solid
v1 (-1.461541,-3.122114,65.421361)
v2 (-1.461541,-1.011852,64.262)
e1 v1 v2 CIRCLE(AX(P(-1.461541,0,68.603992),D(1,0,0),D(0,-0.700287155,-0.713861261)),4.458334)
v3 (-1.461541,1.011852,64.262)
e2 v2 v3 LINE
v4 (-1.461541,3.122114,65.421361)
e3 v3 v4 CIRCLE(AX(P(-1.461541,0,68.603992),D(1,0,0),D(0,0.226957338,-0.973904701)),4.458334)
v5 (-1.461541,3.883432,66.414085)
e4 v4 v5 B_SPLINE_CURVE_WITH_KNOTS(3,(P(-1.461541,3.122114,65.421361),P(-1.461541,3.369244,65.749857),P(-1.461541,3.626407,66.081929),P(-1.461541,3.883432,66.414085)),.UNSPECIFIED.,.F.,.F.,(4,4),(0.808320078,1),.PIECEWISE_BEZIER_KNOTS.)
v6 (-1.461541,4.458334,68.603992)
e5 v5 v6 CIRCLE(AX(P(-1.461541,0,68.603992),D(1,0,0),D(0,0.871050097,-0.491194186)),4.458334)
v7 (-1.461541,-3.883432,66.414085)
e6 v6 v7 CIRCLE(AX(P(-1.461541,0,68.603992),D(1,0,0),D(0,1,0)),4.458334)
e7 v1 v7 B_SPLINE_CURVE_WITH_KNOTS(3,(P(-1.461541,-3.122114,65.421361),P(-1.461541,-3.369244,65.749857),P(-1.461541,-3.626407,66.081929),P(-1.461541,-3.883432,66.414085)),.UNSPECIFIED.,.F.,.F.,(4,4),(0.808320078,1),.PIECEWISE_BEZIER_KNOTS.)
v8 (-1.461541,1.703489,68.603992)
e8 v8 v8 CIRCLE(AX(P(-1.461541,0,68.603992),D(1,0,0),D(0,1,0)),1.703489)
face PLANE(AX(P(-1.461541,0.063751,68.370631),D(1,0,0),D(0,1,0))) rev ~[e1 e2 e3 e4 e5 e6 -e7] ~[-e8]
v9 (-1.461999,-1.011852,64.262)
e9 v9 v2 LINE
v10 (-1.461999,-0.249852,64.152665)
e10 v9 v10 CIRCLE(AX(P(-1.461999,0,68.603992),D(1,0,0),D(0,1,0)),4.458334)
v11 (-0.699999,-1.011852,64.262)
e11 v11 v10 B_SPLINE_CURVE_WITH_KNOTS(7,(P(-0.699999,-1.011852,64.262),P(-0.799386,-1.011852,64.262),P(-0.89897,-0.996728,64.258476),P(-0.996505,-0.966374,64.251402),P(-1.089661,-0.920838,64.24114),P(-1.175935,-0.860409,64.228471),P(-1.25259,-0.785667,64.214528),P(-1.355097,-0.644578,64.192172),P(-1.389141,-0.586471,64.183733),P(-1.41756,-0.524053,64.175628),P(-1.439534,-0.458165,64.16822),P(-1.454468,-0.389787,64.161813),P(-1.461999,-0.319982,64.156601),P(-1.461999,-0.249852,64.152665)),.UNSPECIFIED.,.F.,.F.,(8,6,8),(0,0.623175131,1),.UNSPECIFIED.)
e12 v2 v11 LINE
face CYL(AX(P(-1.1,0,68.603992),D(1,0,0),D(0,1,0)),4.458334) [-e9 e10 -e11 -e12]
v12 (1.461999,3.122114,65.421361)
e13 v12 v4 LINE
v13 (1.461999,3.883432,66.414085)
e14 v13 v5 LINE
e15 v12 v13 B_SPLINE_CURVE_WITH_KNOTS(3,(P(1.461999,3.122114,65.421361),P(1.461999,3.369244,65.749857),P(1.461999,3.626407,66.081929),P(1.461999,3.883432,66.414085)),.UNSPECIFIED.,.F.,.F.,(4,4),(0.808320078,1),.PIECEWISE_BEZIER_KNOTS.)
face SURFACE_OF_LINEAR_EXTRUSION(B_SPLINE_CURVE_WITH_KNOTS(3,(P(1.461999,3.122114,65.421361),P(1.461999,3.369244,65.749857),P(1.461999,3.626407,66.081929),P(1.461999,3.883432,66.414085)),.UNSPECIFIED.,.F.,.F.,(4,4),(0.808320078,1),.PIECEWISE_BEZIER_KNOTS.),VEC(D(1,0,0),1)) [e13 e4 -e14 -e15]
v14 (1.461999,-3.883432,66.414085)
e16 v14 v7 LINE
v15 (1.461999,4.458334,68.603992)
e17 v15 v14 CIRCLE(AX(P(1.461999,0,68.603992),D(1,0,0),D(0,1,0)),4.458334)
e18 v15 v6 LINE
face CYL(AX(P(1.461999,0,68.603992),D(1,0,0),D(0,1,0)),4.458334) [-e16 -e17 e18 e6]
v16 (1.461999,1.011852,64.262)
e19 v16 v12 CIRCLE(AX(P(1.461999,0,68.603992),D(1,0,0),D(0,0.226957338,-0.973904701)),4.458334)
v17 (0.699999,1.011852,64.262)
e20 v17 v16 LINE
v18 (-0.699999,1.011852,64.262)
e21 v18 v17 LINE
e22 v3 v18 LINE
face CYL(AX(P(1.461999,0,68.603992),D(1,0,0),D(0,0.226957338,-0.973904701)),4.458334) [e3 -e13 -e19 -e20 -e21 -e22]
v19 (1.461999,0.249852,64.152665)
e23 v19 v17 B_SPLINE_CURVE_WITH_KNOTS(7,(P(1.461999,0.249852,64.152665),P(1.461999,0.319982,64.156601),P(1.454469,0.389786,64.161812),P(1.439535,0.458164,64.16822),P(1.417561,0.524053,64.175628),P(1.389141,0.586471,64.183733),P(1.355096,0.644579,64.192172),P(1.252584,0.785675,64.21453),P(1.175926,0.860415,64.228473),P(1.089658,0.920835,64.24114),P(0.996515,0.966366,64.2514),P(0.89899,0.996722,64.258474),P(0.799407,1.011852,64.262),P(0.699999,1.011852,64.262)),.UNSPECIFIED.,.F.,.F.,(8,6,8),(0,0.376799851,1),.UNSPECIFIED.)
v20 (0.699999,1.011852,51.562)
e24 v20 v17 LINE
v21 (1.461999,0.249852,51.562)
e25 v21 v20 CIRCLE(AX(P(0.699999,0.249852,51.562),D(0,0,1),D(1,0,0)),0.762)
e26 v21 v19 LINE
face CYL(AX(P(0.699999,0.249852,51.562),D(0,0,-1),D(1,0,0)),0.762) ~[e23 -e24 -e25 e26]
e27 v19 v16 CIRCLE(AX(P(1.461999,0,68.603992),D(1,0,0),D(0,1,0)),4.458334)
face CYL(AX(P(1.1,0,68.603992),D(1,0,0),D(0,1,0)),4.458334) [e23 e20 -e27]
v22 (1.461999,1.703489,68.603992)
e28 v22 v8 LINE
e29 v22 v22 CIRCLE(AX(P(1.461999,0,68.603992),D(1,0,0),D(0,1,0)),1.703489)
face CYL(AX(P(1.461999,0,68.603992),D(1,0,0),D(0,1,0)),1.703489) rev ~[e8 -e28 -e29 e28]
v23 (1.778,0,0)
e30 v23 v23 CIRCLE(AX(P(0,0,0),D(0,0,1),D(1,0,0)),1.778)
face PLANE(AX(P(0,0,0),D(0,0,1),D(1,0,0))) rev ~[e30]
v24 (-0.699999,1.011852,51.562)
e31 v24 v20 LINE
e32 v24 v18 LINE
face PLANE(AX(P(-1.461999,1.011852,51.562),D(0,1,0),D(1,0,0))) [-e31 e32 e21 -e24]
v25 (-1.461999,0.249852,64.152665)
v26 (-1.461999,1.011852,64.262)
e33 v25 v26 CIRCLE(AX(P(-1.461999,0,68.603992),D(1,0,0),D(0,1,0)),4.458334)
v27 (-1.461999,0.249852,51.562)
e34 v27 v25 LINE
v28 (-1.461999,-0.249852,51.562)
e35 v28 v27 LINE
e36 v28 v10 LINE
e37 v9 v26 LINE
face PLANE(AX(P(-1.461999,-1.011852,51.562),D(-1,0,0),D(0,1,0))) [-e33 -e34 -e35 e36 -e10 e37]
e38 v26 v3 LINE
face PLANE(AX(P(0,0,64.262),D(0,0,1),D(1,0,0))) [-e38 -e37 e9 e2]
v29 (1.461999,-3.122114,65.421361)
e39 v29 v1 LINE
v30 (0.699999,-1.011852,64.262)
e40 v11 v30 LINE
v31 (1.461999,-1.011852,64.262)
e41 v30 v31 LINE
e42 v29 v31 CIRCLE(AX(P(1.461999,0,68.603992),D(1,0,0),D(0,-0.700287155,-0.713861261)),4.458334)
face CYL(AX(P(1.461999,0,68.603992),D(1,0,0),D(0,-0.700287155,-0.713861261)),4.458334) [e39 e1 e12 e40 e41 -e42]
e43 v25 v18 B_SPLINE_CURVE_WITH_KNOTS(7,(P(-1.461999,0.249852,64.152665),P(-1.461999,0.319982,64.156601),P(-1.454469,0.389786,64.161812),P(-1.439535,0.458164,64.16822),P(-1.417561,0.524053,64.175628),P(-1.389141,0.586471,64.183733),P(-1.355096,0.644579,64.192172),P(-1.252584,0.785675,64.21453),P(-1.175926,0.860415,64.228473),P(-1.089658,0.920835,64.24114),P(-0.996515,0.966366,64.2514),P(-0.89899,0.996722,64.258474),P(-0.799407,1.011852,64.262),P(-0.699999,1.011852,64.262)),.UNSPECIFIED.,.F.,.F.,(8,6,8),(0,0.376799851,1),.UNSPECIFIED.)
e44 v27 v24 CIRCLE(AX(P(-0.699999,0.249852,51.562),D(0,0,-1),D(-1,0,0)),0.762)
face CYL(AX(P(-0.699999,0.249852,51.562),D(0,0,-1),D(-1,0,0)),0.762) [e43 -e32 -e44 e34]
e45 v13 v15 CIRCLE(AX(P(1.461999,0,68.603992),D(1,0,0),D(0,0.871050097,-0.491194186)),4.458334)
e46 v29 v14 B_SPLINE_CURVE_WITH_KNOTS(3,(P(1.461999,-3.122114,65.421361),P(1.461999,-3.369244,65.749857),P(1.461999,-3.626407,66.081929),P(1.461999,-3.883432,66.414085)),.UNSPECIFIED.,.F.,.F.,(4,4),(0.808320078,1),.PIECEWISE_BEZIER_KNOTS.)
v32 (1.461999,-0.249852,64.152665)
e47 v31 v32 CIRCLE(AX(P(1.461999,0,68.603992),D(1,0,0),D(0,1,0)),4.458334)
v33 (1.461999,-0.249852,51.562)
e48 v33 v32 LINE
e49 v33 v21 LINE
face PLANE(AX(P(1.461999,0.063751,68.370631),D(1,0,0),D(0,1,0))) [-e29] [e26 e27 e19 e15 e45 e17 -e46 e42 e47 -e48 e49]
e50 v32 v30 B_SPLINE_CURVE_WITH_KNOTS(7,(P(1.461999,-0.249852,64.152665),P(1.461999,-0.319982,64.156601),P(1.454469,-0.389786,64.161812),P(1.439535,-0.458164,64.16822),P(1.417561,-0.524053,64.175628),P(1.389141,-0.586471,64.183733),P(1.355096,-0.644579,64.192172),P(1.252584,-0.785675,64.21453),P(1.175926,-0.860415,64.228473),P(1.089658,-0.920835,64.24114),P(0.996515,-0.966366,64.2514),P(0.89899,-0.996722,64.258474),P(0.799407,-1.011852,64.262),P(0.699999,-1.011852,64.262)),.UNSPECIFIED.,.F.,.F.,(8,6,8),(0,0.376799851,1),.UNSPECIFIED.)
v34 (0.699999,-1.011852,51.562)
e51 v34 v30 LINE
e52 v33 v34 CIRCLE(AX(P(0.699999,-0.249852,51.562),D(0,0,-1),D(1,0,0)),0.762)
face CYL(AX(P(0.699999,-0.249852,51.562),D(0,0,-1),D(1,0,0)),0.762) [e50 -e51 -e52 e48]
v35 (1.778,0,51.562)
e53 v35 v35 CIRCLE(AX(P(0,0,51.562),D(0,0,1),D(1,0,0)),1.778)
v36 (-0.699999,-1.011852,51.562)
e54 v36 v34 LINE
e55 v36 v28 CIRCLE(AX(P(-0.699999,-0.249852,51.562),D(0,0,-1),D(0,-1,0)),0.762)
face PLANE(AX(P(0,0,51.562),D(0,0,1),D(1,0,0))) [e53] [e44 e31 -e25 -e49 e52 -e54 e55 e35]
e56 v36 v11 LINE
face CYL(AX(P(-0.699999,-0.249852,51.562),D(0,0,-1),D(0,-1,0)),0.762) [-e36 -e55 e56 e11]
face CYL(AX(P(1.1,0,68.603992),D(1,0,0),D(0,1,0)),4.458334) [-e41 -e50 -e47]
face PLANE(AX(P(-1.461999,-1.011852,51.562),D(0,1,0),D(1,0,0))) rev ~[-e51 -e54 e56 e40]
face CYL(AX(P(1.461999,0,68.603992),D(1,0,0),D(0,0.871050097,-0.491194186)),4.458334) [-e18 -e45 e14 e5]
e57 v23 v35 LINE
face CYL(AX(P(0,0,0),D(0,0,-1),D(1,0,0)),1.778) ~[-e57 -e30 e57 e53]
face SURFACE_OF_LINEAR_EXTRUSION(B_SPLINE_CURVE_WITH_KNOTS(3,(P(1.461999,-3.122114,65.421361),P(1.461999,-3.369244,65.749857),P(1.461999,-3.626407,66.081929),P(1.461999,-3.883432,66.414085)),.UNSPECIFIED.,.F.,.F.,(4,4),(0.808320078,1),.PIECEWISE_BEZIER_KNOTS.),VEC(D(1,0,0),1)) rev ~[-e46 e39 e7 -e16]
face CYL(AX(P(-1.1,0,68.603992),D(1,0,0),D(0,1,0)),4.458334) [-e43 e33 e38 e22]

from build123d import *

# Parameters (mm, degrees)
F0_R         = 1.778
F1_DEPTH     = 51.562
F2_W         = 2.9239974657
F2_H         = 2.0237032442
F3_DEPTH     = 12.7
F4_R         = 1.7034886821
F5_DEPTH     = 2.92354
F6_T4_DEPTH  = 14.605
F6_S5_R      = 4.4583340214
F6_T6_DEPTH  = 9
F6_T10_DEPTH = 14.605
F6_S11_R     = 4.4583340214
F6_T12_DEPTH = 9
F6_T16_DEPTH = 14.605
F6_S17_R     = 4.4583340214
F6_T18_DEPTH = 9
F6_T22_DEPTH = 14.605
F6_S23_R     = 4.4583340214
F6_T24_DEPTH = 9


# Not quite as in the source:
# - a fillet or chamfer that OpenCascade refuses, or shapes differently, is made with other operations: its cross-section is extruded or revolved along the edge and cut away or added


with BuildPart() as f1:
    # F0 (on Top) → F1 (new body)
    with BuildSketch(Plane.XY):
        Circle(F0_R)
    extrude(amount=F1_DEPTH)

    # F2 (on face) → F3 (join)
    with BuildSketch(Plane.XY.offset(51.562)):
        Rectangle(F2_W, F2_H)
    extrude(amount=F3_DEPTH)

    # F4 (on face) → F5 (join)
    with BuildSketch(Plane.YZ.offset(1.4619987328)):
        with BuildLine():
            ThreePointArc((3.8834322811, 66.4140847097), (4.3122140778, 67.4719359292), (4.4583340214, 68.6039924622))
            ThreePointArc((4.4583340214, 68.6039924622), (-1.132056533, 72.91620654), (-3.8834322811, 66.4140847097))
            add(Edge.make_bspline(
                [(-3.1221140478, 65.4213605138), (-3.3692442223, 65.7498568477), (-3.6264069605, 66.0819292585), (-3.8834322811, 66.4140847097)],
                knots=[0.8083200784, 0.8083200784, 0.8083200784, 0.8083200784, 1, 1, 1, 1], degree=3))
            ThreePointArc((-3.1221140478, 65.4213605138), (-2.1467294288, 64.6965258908), (-1.0118516221, 64.262))
            Line((-1.0118516221, 64.262), (1.0118516221, 64.262))
            ThreePointArc((1.0118516221, 64.262), (2.1467294288, 64.6965258908), (3.1221140478, 65.4213605138))
            add(Edge.make_bspline(
                [(3.1221140478, 65.4213605138), (3.3692442223, 65.7498568477), (3.6264069605, 66.0819292585), (3.8834322811, 66.4140847097)],
                knots=[0.8083200784, 0.8083200784, 0.8083200784, 0.8083200784, 1, 1, 1, 1], degree=3))
        make_face()
        with Locations((0, 68.6039924622)):
            Circle(F4_R, mode=Mode.SUBTRACT)
    extrude(amount=-F5_DEPTH)

    # F6: fillet of radius 0.762 on 4 edges, made by hand


with BuildPart() as f6_tool2:
    # F6_s3 → F6_t4 (new body)
    with BuildSketch(Plane.XY.offset(51.562)):
        with BuildLine():
            ThreePointArc((1.4619987328, -0.2498516221), (1.2388141001, -0.7886669894), (0.6999987328, -1.0118516221))
            Line((0.6999987328, -1.0118516221), (1.4619987328, -1.0118516221))
            Line((1.4619987328, -1.0118516221), (1.4619987328, -0.2498516221))
        make_face()
    extrude(amount=F6_T4_DEPTH)

    # F6_s5 → F6_t6 (cut, symmetric)
    with BuildSketch(Plane.YZ.offset(1.1)):
        with Locations((0, 68.6039924622)):
            Circle(F6_S5_R)
    extrude(amount=F6_T6_DEPTH, both=True, mode=Mode.SUBTRACT)


with BuildPart() as f1_1:
    add(f1.part)

    # F6_t1: cut F6_tool2
    add(f6_tool2.part, mode=Mode.SUBTRACT)


with BuildPart() as f6_tool8:
    # F6_s9 → F6_t10 (new body)
    with BuildSketch(Plane.XY.offset(51.562)):
        with BuildLine():
            ThreePointArc((-1.4619987328, 0.2498516221), (-1.2388141001, 0.7886669894), (-0.6999987328, 1.0118516221))
            Line((-0.6999987328, 1.0118516221), (-1.4619987328, 1.0118516221))
            Line((-1.4619987328, 1.0118516221), (-1.4619987328, 0.2498516221))
        make_face()
    extrude(amount=F6_T10_DEPTH)

    # F6_s11 → F6_t12 (cut, symmetric)
    with BuildSketch(Plane.YZ.offset(-1.1)):
        with Locations((0, 68.6039924622)):
            Circle(F6_S11_R)
    extrude(amount=F6_T12_DEPTH, both=True, mode=Mode.SUBTRACT)


with BuildPart() as f1_2:
    add(f1_1.part)

    # F6_t7: cut F6_tool8
    add(f6_tool8.part, mode=Mode.SUBTRACT)


with BuildPart() as f6_tool14:
    # F6_s15 → F6_t16 (new body)
    with BuildSketch(Plane.XY.offset(51.562)):
        with BuildLine():
            ThreePointArc((1.4619987328, 0.2498516221), (1.2388141001, 0.7886669894), (0.6999987328, 1.0118516221))
            Line((0.6999987328, 1.0118516221), (1.4619987328, 1.0118516221))
            Line((1.4619987328, 1.0118516221), (1.4619987328, 0.2498516221))
        make_face()
    extrude(amount=F6_T16_DEPTH)

    # F6_s17 → F6_t18 (cut, symmetric)
    with BuildSketch(Plane.YZ.offset(1.1)):
        with Locations((0, 68.6039924622)):
            Circle(F6_S17_R)
    extrude(amount=F6_T18_DEPTH, both=True, mode=Mode.SUBTRACT)


with BuildPart() as f1_3:
    add(f1_2.part)

    # F6_t13: cut F6_tool14
    add(f6_tool14.part, mode=Mode.SUBTRACT)


with BuildPart() as f6_tool20:
    # F6_s21 → F6_t22 (new body)
    with BuildSketch(Plane.XY.offset(51.562)):
        with BuildLine():
            ThreePointArc((-0.6999987328, -1.0118516221), (-1.2388141001, -0.7886669894), (-1.4619987328, -0.2498516221))
            Line((-1.4619987328, -0.2498516221), (-1.4619987328, -1.0118516221))
            Line((-1.4619987328, -1.0118516221), (-0.6999987328, -1.0118516221))
        make_face()
    extrude(amount=F6_T22_DEPTH)

    # F6_s23 → F6_t24 (cut, symmetric)
    with BuildSketch(Plane.YZ.offset(-1.1)):
        with Locations((0, 68.6039924622)):
            Circle(F6_S23_R)
    extrude(amount=F6_T24_DEPTH, both=True, mode=Mode.SUBTRACT)


with BuildPart() as f1_4:
    add(f1_3.part)

    # F6_t19: cut F6_tool20
    add(f6_tool20.part, mode=Mode.SUBTRACT)


solid = f1_4.part
